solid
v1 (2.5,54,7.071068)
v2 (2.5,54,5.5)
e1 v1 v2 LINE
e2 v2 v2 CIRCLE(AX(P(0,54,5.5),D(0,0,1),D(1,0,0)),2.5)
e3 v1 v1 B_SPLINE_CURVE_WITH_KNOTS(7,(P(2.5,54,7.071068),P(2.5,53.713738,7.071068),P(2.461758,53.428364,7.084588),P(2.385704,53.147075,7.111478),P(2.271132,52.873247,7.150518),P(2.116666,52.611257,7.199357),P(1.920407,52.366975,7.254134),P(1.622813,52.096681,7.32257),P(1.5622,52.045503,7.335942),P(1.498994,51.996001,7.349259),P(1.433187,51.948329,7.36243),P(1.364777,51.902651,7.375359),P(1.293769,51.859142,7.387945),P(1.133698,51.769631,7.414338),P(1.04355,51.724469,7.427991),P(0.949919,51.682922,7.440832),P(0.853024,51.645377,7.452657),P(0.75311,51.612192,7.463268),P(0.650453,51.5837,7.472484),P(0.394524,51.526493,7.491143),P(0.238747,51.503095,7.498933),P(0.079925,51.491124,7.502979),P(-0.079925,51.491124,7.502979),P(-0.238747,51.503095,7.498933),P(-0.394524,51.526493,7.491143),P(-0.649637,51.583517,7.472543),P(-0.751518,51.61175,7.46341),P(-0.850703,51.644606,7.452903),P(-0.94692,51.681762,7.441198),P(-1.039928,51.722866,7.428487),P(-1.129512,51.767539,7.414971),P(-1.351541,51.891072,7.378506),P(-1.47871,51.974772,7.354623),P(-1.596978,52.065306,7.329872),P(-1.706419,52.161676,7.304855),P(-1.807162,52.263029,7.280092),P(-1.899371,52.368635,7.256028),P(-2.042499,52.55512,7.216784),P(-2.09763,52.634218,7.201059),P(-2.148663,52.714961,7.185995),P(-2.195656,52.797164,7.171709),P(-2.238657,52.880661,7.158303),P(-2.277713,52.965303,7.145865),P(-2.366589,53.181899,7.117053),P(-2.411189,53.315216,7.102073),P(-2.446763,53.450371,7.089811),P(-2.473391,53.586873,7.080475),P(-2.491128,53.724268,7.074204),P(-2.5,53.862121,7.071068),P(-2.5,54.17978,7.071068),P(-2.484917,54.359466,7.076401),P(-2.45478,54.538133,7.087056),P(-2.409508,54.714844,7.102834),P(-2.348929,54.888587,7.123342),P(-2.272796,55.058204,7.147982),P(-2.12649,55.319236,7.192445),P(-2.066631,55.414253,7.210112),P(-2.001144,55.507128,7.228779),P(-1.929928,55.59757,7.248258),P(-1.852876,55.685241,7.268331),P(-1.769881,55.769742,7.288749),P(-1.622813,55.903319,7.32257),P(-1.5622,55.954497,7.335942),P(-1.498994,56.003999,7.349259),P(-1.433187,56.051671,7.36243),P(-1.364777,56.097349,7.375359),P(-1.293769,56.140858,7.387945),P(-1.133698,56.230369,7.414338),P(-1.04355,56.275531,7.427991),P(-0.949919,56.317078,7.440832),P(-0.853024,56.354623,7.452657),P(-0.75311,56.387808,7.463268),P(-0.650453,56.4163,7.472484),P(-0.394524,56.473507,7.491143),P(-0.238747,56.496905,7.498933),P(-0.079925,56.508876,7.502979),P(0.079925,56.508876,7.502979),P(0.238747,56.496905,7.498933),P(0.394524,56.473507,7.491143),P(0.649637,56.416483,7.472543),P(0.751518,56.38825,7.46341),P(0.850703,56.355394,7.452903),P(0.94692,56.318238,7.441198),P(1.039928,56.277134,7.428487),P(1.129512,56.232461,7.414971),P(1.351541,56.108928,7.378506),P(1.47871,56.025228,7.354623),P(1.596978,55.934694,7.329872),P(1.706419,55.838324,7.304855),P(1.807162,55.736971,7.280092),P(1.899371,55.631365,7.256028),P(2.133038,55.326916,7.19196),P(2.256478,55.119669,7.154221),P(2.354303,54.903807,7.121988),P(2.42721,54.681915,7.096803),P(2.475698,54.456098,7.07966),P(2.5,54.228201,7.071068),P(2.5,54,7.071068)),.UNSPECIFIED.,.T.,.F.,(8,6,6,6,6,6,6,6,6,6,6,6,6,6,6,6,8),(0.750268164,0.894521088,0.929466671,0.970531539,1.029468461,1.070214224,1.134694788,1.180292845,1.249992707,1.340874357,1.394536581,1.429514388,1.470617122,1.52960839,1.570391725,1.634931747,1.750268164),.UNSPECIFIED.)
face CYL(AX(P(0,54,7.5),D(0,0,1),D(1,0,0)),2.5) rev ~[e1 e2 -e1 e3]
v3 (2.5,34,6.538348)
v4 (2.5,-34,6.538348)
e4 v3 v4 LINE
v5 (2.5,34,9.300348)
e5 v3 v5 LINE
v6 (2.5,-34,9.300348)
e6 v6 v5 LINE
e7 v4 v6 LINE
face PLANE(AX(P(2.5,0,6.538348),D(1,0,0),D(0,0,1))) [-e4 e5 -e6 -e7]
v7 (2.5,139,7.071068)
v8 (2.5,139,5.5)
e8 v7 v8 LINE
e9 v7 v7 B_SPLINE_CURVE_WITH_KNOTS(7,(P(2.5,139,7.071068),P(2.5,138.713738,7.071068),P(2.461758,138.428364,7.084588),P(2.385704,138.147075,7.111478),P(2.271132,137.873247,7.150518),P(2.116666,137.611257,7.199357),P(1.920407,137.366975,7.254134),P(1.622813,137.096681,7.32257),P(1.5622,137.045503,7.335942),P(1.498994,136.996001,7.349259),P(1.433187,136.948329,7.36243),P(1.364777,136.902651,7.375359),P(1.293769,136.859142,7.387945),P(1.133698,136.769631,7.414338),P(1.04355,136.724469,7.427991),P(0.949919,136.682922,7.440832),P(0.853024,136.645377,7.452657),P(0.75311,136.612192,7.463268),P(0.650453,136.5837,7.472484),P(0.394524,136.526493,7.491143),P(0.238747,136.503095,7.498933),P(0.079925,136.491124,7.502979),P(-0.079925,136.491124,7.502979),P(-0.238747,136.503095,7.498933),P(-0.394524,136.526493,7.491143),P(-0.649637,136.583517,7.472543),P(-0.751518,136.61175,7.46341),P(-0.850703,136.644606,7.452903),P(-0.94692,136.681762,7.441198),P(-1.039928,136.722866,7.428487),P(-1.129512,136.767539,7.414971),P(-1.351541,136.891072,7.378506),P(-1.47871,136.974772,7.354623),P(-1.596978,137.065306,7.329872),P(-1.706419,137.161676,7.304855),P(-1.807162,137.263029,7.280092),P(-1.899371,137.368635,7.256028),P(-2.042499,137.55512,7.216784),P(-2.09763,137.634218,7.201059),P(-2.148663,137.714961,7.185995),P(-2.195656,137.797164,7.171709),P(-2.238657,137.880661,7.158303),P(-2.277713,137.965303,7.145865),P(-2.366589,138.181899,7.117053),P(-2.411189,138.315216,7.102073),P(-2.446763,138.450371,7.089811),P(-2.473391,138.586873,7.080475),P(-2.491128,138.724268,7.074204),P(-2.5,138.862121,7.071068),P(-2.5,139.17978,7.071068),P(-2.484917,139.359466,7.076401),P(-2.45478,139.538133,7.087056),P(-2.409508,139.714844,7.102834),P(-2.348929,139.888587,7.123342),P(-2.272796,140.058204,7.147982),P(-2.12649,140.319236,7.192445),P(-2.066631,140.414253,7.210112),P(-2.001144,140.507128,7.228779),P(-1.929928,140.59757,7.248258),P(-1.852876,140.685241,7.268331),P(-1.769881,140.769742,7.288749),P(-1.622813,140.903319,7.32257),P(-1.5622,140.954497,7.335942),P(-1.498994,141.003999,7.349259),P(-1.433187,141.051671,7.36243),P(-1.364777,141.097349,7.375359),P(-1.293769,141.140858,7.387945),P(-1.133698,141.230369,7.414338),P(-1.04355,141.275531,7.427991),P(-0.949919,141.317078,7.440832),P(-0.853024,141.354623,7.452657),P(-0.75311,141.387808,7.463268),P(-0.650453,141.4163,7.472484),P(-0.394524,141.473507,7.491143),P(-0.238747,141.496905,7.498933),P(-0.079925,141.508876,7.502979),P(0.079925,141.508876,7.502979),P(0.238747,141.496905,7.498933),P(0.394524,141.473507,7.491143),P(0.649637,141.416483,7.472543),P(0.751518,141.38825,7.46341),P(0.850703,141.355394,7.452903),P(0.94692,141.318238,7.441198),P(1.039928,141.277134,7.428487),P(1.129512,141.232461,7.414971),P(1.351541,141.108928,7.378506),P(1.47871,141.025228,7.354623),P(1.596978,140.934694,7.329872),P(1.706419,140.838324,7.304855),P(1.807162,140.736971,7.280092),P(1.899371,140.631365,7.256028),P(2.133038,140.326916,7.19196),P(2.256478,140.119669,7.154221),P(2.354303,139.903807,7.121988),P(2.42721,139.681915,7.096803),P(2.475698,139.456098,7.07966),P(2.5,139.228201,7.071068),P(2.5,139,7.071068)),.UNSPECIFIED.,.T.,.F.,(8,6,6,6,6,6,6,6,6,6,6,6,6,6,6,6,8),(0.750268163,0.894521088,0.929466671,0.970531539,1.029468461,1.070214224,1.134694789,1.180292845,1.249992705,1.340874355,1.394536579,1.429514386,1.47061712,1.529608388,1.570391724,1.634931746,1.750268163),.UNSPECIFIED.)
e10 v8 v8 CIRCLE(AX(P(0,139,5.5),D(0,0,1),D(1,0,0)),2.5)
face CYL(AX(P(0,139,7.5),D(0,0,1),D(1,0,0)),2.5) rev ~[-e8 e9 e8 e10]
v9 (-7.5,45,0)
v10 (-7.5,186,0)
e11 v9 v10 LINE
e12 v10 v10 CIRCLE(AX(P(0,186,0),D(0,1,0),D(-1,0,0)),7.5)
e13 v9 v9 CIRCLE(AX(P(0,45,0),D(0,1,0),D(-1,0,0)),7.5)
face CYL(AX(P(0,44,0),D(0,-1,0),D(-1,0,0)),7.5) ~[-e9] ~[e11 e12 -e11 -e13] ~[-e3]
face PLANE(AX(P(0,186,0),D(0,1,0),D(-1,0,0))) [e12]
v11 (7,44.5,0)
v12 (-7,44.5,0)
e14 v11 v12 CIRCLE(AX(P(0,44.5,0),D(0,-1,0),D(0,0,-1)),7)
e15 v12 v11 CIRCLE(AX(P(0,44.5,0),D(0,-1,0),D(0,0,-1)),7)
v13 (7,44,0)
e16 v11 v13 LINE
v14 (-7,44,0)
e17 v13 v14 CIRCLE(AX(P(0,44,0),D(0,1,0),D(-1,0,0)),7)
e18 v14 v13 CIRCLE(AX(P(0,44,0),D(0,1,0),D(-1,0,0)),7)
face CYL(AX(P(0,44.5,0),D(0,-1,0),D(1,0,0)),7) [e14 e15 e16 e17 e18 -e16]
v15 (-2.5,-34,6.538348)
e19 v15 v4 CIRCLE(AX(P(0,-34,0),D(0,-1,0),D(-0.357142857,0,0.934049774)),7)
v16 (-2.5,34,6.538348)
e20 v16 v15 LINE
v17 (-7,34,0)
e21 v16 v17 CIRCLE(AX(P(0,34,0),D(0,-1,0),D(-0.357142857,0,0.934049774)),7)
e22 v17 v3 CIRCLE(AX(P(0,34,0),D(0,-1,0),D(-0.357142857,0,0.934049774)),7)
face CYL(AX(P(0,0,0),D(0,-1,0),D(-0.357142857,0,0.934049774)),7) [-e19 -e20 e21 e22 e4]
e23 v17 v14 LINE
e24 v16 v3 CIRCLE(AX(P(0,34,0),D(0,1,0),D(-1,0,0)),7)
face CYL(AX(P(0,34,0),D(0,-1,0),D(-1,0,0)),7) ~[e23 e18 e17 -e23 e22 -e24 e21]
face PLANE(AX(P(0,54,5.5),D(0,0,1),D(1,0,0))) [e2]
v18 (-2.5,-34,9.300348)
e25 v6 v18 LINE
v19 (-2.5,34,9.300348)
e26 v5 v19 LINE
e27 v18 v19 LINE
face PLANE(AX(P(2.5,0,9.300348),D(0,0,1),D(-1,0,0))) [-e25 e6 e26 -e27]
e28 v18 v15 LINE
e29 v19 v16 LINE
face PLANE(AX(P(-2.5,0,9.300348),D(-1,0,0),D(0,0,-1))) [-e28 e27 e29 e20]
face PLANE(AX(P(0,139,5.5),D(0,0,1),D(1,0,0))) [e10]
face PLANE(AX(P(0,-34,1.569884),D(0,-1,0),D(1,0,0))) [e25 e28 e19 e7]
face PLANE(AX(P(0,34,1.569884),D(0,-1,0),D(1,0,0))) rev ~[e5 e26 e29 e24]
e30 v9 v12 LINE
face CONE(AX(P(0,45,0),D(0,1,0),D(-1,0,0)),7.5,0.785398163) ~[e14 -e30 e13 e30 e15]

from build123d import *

# Parameters (mm, degrees)
F1_DEPTH    = 34
F2_R        = 7
F3_DEPTH    = 10
F4_R        = 7.5
F5_DEPTH    = 142
F7_R        = 2.5
F8_DEPTH    = 2
F9_S5_R     = 7
F9_T6_DEPTH = 12


# Not quite as in the source:
# - a fillet or chamfer that OpenCascade refuses, or shapes differently, is made with other operations: its cross-section is extruded or revolved along the edge and cut away or added
# - after a boolean that leaves OpenCascade's solid faulty, fix() repairs it


with BuildPart() as f1:
    # F0 (on Front) → F1 (new body, symmetric)
    with BuildSketch(Plane.XZ):
        with BuildLine():
            Line((-2.5, 9.3003484153), (-2.5, 6.5383484153))
            ThreePointArc((-2.5, 6.5383484153), (0, -7), (2.5, 6.5383484153))
            Line((2.5, 6.5383484153), (2.5, 9.3003484153))
            Line((2.5, 9.3003484153), (-2.5, 9.3003484153))
        make_face()
    extrude(amount=F1_DEPTH, both=True)

    # F2 (on face) → F3 (join)
    with BuildSketch(Plane(origin=(0, 34, 0), x_dir=(-1, 0, 0), z_dir=(0, 1, 0))):
        Circle(F2_R)
    extrude(amount=F3_DEPTH)

    # F4 (on face) → F5 (join)
    with BuildSketch(Plane(origin=(0, 44, 0), x_dir=(-1, 0, 0), z_dir=(0, 1, 0))):
        Circle(F4_R)
    extrude(amount=F5_DEPTH)

    add(f1.part.fix(), mode=Mode.REPLACE)

    # F7 (on offset) → F8 (cut)
    with BuildSketch(Plane.XY.offset(7.5)):
        with Locations((0, 54)):
            Circle(F7_R)
        with Locations((0, 139)):
            Circle(F7_R)
    extrude(amount=-F8_DEPTH, mode=Mode.SUBTRACT)

    # F9: chamfer of 1 on 1 edges, made by hand


with BuildPart() as f9_tool2:
    # F9_s3 → F9_t4 (revolve)
    with BuildSketch(Plane.XY):
        Polygon((-7.5, 45), (-6.5, 44), (-7.5, 44), align=None)
    revolve(axis=Axis((0, 44, 0), (0, 1, 0)))

    # F9_s5 → F9_t6 (cut, symmetric)
    with BuildSketch(Plane.XZ.offset(-44.5)):
        Circle(F9_S5_R)
    extrude(amount=F9_T6_DEPTH, both=True, mode=Mode.SUBTRACT)


with BuildPart() as f1_1:
    add(f1.part)

    # F9_t1: cut F9_tool2
    add(f9_tool2.part, mode=Mode.SUBTRACT)


solid = f1_1.part
